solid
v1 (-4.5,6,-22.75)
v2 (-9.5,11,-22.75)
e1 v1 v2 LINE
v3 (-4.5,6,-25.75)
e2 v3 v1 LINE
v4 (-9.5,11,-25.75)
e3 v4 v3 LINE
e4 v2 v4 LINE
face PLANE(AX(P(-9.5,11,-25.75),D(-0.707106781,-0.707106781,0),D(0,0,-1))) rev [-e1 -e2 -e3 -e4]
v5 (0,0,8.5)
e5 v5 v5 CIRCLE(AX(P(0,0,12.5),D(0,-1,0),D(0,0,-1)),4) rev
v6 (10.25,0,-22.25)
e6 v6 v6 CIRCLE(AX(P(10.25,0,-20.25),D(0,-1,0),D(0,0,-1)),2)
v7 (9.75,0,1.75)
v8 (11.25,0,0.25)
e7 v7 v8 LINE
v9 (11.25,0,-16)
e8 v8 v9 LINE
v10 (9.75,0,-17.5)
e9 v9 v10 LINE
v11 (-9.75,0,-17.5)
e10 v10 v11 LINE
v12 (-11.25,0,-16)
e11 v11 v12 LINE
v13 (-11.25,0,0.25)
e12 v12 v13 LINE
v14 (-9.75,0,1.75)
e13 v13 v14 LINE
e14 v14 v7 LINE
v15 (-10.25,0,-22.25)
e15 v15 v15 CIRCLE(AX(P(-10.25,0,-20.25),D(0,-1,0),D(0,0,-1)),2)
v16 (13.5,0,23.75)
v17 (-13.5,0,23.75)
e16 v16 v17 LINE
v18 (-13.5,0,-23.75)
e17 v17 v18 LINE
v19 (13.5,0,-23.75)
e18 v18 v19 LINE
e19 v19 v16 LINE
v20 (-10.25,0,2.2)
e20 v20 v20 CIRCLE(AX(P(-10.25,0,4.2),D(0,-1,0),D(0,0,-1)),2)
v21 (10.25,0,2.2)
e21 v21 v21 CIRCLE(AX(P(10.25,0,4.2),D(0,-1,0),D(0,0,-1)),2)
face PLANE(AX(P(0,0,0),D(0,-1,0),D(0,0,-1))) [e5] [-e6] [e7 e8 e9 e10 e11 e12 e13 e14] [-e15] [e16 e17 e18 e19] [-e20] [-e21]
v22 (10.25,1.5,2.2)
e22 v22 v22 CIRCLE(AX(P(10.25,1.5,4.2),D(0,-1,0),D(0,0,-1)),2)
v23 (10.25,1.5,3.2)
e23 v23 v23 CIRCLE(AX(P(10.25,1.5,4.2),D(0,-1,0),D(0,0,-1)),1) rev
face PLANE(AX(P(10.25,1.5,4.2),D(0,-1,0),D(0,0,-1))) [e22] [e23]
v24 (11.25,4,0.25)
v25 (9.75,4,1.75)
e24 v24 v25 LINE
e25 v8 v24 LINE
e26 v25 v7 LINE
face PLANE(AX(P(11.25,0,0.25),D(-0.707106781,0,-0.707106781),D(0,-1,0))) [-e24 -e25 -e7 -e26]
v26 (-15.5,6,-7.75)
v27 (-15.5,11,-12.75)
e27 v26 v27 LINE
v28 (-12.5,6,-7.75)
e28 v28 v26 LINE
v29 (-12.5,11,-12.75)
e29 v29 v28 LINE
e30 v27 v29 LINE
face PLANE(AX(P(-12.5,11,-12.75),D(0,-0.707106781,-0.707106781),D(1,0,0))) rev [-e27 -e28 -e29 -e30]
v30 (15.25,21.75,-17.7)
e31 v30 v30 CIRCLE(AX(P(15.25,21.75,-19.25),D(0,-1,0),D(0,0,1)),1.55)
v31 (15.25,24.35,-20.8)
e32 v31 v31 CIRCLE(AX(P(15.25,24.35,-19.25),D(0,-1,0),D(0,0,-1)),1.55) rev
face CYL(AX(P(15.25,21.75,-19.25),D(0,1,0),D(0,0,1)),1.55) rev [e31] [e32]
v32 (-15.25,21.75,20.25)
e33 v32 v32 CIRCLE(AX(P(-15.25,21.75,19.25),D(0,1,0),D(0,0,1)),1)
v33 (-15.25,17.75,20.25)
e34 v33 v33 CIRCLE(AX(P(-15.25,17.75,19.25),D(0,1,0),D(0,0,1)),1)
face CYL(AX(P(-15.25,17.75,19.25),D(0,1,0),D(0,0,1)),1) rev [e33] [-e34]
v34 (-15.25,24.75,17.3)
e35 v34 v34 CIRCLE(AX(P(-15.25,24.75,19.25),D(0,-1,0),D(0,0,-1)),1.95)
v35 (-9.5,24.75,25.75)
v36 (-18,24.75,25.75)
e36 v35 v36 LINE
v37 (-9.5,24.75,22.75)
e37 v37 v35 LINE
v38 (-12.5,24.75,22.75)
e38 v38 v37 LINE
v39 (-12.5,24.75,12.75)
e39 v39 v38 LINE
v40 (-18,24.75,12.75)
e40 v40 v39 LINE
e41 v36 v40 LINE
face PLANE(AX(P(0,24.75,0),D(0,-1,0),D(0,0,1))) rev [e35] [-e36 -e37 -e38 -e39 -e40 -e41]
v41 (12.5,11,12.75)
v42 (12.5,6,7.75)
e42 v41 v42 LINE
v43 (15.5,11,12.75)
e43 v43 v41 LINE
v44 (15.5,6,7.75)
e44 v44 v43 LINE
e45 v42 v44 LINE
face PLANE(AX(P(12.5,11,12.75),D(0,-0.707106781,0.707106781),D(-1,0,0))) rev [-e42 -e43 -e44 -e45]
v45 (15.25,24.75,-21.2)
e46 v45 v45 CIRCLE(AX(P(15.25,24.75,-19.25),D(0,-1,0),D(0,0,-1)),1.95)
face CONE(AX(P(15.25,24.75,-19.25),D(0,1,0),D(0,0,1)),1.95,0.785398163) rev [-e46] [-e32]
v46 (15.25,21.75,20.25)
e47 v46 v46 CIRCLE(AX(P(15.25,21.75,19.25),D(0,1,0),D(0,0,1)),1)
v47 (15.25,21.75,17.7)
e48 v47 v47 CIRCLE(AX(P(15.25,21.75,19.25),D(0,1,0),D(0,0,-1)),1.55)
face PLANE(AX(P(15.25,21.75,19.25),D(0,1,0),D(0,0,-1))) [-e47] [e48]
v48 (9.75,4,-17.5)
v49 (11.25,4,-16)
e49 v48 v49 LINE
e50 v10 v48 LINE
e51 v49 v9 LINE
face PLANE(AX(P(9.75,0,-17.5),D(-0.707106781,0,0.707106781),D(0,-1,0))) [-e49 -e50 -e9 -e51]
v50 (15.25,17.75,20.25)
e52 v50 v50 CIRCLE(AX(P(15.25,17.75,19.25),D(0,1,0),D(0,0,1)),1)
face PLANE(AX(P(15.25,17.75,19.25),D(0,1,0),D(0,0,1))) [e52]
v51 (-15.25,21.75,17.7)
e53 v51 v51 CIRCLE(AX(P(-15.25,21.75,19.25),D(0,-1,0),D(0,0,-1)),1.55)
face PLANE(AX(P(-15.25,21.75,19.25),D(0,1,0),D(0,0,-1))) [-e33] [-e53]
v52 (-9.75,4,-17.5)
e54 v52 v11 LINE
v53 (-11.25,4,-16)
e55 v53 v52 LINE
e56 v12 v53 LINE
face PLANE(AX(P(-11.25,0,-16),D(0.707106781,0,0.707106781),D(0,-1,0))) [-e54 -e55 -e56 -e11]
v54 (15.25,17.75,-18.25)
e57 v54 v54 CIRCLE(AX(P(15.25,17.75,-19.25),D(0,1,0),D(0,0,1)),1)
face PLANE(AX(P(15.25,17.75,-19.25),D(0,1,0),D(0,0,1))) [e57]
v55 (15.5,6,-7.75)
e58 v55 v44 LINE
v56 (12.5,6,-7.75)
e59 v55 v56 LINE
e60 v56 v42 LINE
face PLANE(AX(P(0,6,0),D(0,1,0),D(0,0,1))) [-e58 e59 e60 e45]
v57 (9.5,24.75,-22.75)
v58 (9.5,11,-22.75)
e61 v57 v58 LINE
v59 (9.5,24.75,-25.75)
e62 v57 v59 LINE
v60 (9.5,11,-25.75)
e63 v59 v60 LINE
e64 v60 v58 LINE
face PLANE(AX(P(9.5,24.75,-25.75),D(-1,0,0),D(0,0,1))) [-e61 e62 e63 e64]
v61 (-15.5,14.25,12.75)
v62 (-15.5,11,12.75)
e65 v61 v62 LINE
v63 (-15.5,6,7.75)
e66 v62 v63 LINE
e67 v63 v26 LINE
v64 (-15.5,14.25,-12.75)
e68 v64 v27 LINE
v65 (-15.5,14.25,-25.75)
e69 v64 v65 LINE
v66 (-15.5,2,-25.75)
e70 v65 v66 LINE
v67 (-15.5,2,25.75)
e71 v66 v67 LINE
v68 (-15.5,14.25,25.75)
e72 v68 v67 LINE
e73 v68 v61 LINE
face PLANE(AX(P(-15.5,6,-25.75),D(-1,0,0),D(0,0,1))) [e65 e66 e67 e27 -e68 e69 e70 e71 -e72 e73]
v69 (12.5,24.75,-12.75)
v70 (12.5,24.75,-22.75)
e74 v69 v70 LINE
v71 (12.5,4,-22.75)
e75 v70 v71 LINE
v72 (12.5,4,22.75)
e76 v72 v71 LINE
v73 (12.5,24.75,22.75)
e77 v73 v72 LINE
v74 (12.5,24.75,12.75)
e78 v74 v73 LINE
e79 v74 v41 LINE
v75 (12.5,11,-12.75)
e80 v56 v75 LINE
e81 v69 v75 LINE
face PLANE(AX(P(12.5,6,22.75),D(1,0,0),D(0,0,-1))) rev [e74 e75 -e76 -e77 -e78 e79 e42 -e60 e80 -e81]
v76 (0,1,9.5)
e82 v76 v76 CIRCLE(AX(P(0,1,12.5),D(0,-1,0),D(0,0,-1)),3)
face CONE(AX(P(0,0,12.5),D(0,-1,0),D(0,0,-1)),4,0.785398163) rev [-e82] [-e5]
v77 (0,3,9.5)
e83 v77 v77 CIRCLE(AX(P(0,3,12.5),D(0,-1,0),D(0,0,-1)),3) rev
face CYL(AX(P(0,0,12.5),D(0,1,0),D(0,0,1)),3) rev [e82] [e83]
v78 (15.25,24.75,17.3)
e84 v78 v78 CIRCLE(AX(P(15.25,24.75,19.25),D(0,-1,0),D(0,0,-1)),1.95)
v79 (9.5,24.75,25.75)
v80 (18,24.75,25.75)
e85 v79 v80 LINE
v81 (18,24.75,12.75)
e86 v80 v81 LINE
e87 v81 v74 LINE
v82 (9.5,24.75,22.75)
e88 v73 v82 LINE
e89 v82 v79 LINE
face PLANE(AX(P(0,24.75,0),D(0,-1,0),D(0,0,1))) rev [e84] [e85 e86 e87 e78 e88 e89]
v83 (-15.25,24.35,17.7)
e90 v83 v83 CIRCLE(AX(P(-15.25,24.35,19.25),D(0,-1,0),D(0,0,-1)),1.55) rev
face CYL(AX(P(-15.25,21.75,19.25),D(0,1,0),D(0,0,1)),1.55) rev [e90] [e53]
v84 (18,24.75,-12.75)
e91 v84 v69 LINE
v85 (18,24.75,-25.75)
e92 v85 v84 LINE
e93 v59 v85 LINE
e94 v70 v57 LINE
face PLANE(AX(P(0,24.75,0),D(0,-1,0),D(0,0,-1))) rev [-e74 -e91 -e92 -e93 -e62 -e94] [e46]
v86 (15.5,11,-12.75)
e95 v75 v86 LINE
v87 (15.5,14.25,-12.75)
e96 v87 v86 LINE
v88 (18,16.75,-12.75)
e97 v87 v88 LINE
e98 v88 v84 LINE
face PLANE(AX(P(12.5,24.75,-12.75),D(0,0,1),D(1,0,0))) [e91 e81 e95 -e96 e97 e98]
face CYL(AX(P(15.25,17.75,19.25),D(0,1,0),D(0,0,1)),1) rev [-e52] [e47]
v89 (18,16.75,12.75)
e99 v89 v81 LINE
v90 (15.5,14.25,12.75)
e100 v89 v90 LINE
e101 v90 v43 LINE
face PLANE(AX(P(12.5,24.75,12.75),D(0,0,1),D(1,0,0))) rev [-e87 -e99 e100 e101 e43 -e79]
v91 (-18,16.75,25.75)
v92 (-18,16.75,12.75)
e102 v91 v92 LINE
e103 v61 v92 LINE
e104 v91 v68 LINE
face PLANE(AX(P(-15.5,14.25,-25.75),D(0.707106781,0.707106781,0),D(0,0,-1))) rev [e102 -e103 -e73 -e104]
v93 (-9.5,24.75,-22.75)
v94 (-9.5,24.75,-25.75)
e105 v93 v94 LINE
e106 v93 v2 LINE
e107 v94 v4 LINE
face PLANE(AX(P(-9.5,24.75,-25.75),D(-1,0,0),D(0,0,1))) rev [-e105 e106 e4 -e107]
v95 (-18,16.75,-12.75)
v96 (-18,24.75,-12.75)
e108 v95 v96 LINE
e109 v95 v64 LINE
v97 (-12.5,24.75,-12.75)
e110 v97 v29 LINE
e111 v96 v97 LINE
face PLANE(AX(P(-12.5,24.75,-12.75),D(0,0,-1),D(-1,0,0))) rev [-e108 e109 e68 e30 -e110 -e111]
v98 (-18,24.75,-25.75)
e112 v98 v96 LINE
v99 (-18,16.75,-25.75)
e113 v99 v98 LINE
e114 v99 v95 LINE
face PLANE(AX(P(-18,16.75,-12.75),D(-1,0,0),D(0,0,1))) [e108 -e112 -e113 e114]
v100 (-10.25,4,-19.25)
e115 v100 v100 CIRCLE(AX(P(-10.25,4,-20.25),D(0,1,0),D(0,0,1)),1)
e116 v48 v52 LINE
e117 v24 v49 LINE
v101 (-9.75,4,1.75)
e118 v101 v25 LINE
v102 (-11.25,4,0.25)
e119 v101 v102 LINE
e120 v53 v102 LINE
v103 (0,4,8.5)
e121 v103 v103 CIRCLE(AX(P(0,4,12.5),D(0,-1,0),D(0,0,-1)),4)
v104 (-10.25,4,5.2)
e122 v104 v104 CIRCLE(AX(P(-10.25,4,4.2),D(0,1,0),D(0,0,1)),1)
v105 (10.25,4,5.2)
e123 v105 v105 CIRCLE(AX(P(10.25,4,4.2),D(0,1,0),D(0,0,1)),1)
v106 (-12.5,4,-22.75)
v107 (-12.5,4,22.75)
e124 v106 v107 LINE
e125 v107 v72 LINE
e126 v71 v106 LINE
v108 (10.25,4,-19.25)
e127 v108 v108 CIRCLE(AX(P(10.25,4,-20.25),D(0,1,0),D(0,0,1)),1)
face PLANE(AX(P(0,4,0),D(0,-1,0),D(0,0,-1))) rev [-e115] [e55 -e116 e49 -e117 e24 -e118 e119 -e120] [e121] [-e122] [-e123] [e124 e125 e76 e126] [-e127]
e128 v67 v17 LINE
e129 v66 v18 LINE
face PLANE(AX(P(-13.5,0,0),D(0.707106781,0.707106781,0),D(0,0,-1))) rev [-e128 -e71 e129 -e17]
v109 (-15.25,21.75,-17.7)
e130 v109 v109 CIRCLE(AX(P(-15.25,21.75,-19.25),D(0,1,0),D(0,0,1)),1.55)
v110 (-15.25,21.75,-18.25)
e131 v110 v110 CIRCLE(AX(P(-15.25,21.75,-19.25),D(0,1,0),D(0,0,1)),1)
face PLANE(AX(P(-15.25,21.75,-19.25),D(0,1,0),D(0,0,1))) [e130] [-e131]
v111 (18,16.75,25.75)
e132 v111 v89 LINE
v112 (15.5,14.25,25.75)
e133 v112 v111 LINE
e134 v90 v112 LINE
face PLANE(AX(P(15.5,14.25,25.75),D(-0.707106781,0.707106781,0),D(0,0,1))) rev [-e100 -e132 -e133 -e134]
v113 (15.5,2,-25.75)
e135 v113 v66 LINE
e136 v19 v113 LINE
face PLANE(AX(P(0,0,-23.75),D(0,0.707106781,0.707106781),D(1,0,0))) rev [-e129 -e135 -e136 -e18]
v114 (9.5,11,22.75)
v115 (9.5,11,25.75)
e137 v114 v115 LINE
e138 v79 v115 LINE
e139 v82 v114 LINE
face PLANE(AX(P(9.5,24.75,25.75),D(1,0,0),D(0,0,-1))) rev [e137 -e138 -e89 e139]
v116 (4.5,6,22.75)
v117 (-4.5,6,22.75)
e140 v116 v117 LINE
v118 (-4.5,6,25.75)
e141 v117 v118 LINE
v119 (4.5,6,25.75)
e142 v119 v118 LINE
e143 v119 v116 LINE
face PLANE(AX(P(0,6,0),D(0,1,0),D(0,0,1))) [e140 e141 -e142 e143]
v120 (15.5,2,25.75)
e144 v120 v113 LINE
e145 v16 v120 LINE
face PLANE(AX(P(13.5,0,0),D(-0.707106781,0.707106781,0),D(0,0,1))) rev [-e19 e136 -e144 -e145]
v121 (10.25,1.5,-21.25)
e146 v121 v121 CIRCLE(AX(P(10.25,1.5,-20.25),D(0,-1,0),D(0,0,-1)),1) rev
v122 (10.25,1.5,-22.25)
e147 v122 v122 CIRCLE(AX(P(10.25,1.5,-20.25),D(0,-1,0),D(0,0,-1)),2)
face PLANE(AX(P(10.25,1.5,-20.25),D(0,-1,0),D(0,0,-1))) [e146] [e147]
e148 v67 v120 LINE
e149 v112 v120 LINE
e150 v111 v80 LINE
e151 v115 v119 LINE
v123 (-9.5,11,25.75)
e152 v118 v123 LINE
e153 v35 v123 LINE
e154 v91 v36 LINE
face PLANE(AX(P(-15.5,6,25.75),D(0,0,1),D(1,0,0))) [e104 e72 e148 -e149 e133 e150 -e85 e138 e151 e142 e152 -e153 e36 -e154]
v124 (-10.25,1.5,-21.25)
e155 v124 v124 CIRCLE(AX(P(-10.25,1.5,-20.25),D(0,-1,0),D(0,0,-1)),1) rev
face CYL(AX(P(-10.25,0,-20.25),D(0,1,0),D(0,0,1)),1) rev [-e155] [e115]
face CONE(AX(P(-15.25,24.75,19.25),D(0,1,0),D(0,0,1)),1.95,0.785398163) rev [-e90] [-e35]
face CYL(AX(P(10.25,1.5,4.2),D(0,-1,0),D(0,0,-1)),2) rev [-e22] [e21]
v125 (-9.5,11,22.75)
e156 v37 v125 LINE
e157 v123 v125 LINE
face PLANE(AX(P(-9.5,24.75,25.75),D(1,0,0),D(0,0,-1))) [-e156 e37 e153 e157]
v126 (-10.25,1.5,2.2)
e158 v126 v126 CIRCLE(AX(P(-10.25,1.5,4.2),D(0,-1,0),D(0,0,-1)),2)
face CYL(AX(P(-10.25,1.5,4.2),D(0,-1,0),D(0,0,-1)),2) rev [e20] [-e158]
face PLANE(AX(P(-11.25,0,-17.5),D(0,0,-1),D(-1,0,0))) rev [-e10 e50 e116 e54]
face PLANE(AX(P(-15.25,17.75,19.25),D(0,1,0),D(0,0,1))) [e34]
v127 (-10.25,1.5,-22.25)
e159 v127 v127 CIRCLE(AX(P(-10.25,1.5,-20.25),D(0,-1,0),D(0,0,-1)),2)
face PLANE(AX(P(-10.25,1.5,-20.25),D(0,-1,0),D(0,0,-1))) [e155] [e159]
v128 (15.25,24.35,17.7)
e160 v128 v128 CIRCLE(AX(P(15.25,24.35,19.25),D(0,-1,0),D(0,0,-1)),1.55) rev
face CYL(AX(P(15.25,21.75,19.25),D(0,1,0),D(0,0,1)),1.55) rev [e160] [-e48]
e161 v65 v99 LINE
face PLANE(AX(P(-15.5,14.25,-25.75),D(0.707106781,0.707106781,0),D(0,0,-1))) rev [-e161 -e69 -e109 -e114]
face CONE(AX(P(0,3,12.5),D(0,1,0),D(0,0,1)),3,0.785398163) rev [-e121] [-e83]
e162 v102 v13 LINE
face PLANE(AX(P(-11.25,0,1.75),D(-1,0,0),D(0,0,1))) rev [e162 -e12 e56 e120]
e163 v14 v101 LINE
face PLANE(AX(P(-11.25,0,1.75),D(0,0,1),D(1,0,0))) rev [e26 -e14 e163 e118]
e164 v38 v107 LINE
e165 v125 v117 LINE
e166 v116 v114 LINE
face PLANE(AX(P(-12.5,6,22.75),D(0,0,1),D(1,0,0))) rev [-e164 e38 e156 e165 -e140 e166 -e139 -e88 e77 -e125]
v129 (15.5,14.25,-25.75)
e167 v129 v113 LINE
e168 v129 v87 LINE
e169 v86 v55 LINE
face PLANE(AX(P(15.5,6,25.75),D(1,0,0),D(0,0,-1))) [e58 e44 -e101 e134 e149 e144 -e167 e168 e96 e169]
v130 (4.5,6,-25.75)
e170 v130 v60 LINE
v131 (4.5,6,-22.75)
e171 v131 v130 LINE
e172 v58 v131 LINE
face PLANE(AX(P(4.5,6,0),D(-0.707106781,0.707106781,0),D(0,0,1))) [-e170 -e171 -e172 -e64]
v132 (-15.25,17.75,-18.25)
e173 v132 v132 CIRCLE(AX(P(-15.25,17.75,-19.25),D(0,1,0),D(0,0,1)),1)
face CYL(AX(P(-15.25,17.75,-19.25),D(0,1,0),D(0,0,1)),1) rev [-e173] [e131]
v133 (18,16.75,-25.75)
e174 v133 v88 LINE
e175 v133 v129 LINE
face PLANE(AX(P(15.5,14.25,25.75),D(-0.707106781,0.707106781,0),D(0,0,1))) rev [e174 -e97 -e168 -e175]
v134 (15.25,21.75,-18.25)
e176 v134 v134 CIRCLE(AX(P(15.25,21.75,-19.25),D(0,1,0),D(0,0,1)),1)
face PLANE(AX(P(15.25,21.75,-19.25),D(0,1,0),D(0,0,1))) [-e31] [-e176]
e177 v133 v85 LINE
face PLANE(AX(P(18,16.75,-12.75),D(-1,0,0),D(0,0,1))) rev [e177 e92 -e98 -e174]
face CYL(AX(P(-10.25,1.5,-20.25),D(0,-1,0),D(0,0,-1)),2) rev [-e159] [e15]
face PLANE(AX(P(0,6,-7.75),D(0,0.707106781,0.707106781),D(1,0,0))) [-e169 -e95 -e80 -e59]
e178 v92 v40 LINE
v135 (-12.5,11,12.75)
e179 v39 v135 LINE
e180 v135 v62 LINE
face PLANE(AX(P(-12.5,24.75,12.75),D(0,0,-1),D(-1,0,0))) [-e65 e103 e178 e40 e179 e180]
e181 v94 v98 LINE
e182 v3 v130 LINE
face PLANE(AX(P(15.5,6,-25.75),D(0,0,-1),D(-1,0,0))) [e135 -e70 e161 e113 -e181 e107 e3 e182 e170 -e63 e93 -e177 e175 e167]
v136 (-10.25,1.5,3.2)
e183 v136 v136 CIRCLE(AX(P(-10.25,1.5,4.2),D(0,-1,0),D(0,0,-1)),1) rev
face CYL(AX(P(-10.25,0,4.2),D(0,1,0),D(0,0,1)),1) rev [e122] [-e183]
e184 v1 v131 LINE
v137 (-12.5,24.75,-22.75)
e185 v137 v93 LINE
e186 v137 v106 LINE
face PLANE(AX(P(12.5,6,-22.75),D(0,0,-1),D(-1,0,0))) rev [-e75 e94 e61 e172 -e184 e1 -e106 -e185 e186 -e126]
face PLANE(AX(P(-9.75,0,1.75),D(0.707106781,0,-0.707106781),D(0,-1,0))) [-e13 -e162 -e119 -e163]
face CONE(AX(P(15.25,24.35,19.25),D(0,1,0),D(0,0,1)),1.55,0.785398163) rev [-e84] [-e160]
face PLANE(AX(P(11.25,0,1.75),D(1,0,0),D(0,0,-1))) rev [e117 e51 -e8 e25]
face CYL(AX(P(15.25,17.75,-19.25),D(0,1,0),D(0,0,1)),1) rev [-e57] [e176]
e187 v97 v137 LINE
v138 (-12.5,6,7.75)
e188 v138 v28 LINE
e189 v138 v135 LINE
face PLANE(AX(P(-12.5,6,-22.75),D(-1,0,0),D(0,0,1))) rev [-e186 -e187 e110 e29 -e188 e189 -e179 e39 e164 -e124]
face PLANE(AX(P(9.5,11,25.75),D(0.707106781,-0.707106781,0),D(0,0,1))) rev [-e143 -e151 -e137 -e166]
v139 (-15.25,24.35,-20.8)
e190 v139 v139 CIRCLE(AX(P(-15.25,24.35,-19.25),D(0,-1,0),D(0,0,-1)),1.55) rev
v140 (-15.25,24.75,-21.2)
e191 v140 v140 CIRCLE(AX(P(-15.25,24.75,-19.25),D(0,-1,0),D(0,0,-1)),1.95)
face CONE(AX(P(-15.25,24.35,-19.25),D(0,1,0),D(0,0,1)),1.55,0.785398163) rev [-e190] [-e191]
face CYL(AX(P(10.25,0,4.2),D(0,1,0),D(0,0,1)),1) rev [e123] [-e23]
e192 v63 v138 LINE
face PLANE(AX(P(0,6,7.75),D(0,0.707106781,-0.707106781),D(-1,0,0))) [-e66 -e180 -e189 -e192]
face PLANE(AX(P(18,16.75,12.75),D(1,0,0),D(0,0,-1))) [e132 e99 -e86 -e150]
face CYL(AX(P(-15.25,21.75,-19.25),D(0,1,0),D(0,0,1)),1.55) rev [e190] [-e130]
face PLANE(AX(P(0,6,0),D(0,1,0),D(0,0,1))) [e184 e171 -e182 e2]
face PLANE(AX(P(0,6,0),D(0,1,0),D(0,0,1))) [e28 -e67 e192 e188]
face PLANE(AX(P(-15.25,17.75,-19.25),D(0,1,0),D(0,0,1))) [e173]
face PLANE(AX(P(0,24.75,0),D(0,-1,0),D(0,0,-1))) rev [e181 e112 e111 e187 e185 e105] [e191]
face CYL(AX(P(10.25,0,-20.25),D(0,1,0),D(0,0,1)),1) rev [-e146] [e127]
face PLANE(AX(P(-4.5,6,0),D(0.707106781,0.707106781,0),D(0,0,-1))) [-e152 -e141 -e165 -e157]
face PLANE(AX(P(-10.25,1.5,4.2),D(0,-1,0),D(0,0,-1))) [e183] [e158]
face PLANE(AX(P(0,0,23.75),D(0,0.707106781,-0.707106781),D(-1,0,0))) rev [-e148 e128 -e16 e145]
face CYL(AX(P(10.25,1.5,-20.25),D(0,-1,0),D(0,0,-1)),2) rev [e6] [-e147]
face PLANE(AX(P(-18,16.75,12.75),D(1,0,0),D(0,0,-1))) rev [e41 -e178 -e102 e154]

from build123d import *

# Parameters (mm, degrees)
SKETCH1_W                                  = 25
SKETCH1_H                                  = 45.5
BOSS_EXTRUDE1_DEPTH                        = 4
SKETCH2_R                                  = 1
CUT_EXTRUDE1_DEPTH                         = 27.264281829
SKETCH3_W                                  = 22.5
SKETCH3_H                                  = 19.25
CUT_EXTRUDE2_DEPTH                         = 4
CHAMFER1_SIZE                              = 1.5
SKETCH4_R                                  = 3
CUT_EXTRUDE3_DEPTH                         = 27.264281829
SKETCH11_W                                 = 31
SKETCH11_H                                 = 51.5
SKETCH11_W_2                               = 25
SKETCH11_H_2                               = 45.5
BOSS_EXTRUDE5_DEPTH                        = 6
BOSS_EXTRUDE6_DEPTH                        = 18.75
SKETCH14_W                                 = 5.5
SKETCH14_H                                 = 13
BOSS_EXTRUDE7_DEPTH                        = 8
SKETCH15_R                                 = 1.55
CUT_EXTRUDE5_DEPTH                         = 3
MIRROR2_AT_THE_SECOND_PLANE_COPY_1_DEPTH   = 18.75
MIRROR2_AT_THE_SECOND_PLANE_COPY_2_SKETC_W = 5.5
MIRROR2_AT_THE_SECOND_PLANE_COPY_2_SKETC_H = 13
MIRROR2_AT_THE_SECOND_PLANE_COPY_2_DEPTH   = 8
MIRROR2_AT_THE_SECOND_PLANE_COPY_3_SKETC_R = 1.55
MIRROR2_AT_THE_SECOND_PLANE_COPY_3_DEPTH   = 3
CHAMFER3_SIZE                              = 2.5
CHAMFER4_SIZE                              = 5
CHAMFER5_SIZE                              = 2
SKETCH16_R                                 = 2
CUT_EXTRUDE6_DEPTH                         = 1.5
CHAMFER6_SIZE                              = 1
CHAMFER7_SIZE                              = 0.4
SKETCH17_R                                 = 1
CUT_EXTRUDE7_DEPTH                         = 4


with BuildPart() as part:
    # Sketch1 → Boss-Extrude1 (new body)
    with BuildSketch(Plane(origin=(0, 0, 0), x_dir=(1, 0, 0), z_dir=(0, 1, 0))):
        Rectangle(SKETCH1_W, SKETCH1_H)
    extrude(amount=BOSS_EXTRUDE1_DEPTH)

    # Sketch2 → Cut-Extrude1 (cut, through all)
    with BuildSketch(Plane(origin=(0, 4, 0), x_dir=(1, 0, 0), z_dir=(0, 1, 0))):
        with Locations(Location((-10.25, 20.25, 0), (0, 0, 270))):
            Circle(SKETCH2_R)
        with Locations(Location((10.25, 20.25, 0), (0, 0, 270))):
            Circle(SKETCH2_R)
        with Locations(Location((10.25, -4.2, 0), (0, 0, 270))):
            Circle(SKETCH2_R)
        with Locations(Location((-10.25, -4.2, 0), (0, 0, 270))):
            Circle(SKETCH2_R)
    extrude(amount=-CUT_EXTRUDE1_DEPTH, mode=Mode.SUBTRACT)

    # Sketch3 → Cut-Extrude2 (cut)
    with BuildSketch(Plane(origin=(0, 4, 0), x_dir=(1, 0, 0), z_dir=(0, 1, 0))):
        with Locations((0, 7.875)):
            Rectangle(SKETCH3_W, SKETCH3_H)
    extrude(amount=-CUT_EXTRUDE2_DEPTH, mode=Mode.SUBTRACT)

    # Chamfer1
    chamfer1_edges = [part.edges().sort_by_distance(p)[0] for p in [
        (11.25, 2, -17.5),
        (11.25, 2, 1.75),
        (-11.25, 2, 1.75),
        (-11.25, 2, -17.5),
    ]]
    chamfer(chamfer1_edges, length=CHAMFER1_SIZE)

    # Sketch4 → Cut-Extrude3 (cut, through all)
    with BuildSketch(Plane(origin=(0, 4, 0), x_dir=(1, 0, 0), z_dir=(0, 1, 0))):
        with Locations(Location((0, -12.5, 0), (0, 0, 270))):
            Circle(SKETCH4_R)
    extrude(amount=-CUT_EXTRUDE3_DEPTH, mode=Mode.SUBTRACT)

    # Sketch11 → Boss-Extrude5 (add)
    with BuildSketch(Plane.XZ):
        Rectangle(SKETCH11_W, SKETCH11_H)
        Rectangle(SKETCH11_W_2, SKETCH11_H_2, mode=Mode.SUBTRACT)
    extrude(amount=-BOSS_EXTRUDE5_DEPTH)

    # Sketch12 → Boss-Extrude6 (add)
    with BuildSketch(Plane(origin=(0, 6, 0), x_dir=(1, 0, 0), z_dir=(0, 1, 0))):
        Polygon((-15.5, 25.75), (-9.5, 25.75), (-9.5, 22.75), (-12.5, 22.75), (-12.5, 12.75), (-15.5, 12.75), align=None)
    boss_extrude6 = extrude(amount=BOSS_EXTRUDE6_DEPTH)

    # Sketch14 → Boss-Extrude7 (add)
    with BuildSketch(Plane(origin=(0, 24.75, 0), x_dir=(1, 0, 0), z_dir=(0, 1, 0))):
        with Locations((-15.25, 19.25)):
            Rectangle(SKETCH14_W, SKETCH14_H)
    boss_extrude7 = extrude(amount=-BOSS_EXTRUDE7_DEPTH)

    # Sketch15 → Cut-Extrude5 (cut)
    with BuildSketch(Plane(origin=(0, 24.75, 0), x_dir=(1, 0, 0), z_dir=(0, 1, 0))):
        with Locations(Location((-15.25, 19.25, 0), (0, 0, 270))):
            Circle(SKETCH15_R)
    cut_extrude5 = extrude(amount=-CUT_EXTRUDE5_DEPTH, mode=Mode.SUBTRACT)

    # Mirror2: Boss-Extrude6, Boss-Extrude7, Cut-Extrude5 across plane
    add(boss_extrude6.mirror(Plane(origin=(0, 0, 0), x_dir=(0, 0, 1), z_dir=(1, 0, 0))))
    add(boss_extrude7.mirror(Plane(origin=(0, 0, 0), x_dir=(0, 0, 1), z_dir=(1, 0, 0))))
    add(cut_extrude5.mirror(Plane(origin=(0, 0, 0), x_dir=(0, 0, 1), z_dir=(1, 0, 0))), mode=Mode.SUBTRACT)

    # Mirror2 at the second plane: Boss-Extrude6, Boss-Extrude7, Cut-Extrude5 across plane
    add(boss_extrude6.mirror(Plane.XY))
    add(boss_extrude7.mirror(Plane.XY))
    add(cut_extrude5.mirror(Plane.XY), mode=Mode.SUBTRACT)

    # Mirror2 at the second plane copy 1 sketc → Mirror2 at the second plane copy 1 (add)
    with BuildSketch(Plane(origin=(0, 6, 0), x_dir=(-1, 0, 0), z_dir=(0, 1, 0))):
        Polygon((-15.5, 25.75), (-9.5, 25.75), (-9.5, 22.75), (-12.5, 22.75), (-12.5, 12.75), (-15.5, 12.75), align=None)
    extrude(amount=MIRROR2_AT_THE_SECOND_PLANE_COPY_1_DEPTH)

    # Mirror2 at the second plane copy 2 sketc → Mirror2 at the second plane copy 2 (add)
    with BuildSketch(Plane(origin=(0, 24.75, 0), x_dir=(-1, 0, 0), z_dir=(0, 1, 0))):
        with Locations((-15.25, 19.25)):
            Rectangle(MIRROR2_AT_THE_SECOND_PLANE_COPY_2_SKETC_W, MIRROR2_AT_THE_SECOND_PLANE_COPY_2_SKETC_H)
    extrude(amount=-MIRROR2_AT_THE_SECOND_PLANE_COPY_2_DEPTH)

    # Mirror2 at the second plane copy 3 sketc → Mirror2 at the second plane copy 3 (cut)
    with BuildSketch(Plane(origin=(0, 24.75, 0), x_dir=(-1, 0, 0), z_dir=(0, 1, 0))):
        with Locations(Location((-15.25, 19.25, 0), (0, 0, 270))):
            Circle(MIRROR2_AT_THE_SECOND_PLANE_COPY_3_SKETC_R)
    extrude(amount=-MIRROR2_AT_THE_SECOND_PLANE_COPY_3_DEPTH, mode=Mode.SUBTRACT)

    # Chamfer3
    # the kernel refuses this chamfer: 2.5 mm, written as the material it adds along each edge
    with BuildSketch(Plane(origin=(-15.5, 16.75, -12.75), x_dir=(0.027495876610586317, -0.9996219169112968, 0), z_dir=(0, 0, -1))) as chamfer3_piece_1_section:
        Polygon((CHAMFER3_SIZE * 0.999621916911, CHAMFER3_SIZE * 0.0274958766106), (-CHAMFER3_SIZE * 0.0274958766106, CHAMFER3_SIZE * 0.999621916911), (0, 0), align=None)
    chamfer3_piece_1 = extrude(amount=13, mode=Mode.PRIVATE)
    chamfer3_piece_1 = split(chamfer3_piece_1, bisect_by=Plane(origin=(-18, 15.923989614, -19.25), z_dir=(1, 0, 0)), keep=Keep.TOP, mode=Mode.PRIVATE)
    add(chamfer3_piece_1)
    with BuildSketch(Plane(origin=(-15.5, 16.75, 12.75), x_dir=(0.027495876610586317, -0.9996219169112968, 0), z_dir=(0, 0, 1))) as chamfer3_piece_2_section:
        Polygon((CHAMFER3_SIZE * 0.999621916911, -CHAMFER3_SIZE * 0.0274958766106), (-CHAMFER3_SIZE * 0.0274958766106, -CHAMFER3_SIZE * 0.999621916911), (0, 0), align=None)
    chamfer3_piece_2 = extrude(amount=13, mode=Mode.PRIVATE)
    chamfer3_piece_2 = split(chamfer3_piece_2, bisect_by=Plane(origin=(-18, 15.923989614, 19.25), z_dir=(1, 0, 0)), keep=Keep.TOP, mode=Mode.PRIVATE)
    add(chamfer3_piece_2)
    with BuildSketch(Plane(origin=(15.5, 16.75, -12.75), x_dir=(-0.027495876610586317, -0.9996219169112968, 0), z_dir=(0, 0, -1))) as chamfer3_piece_3_section:
        Polygon((CHAMFER3_SIZE * 0.999621916911, -CHAMFER3_SIZE * 0.0274958766106), (-CHAMFER3_SIZE * 0.0274958766106, -CHAMFER3_SIZE * 0.999621916911), (0, 0), align=None)
    chamfer3_piece_3 = extrude(amount=13, mode=Mode.PRIVATE)
    chamfer3_piece_3 = split(chamfer3_piece_3, bisect_by=Plane(origin=(18, 15.923989614, -19.25), z_dir=(-1, 0, 0)), keep=Keep.TOP, mode=Mode.PRIVATE)
    add(chamfer3_piece_3)
    with BuildSketch(Plane(origin=(15.5, 16.75, 12.75), x_dir=(-0.027495876610586317, -0.9996219169112968, 0), z_dir=(0, 0, 1))) as chamfer3_piece_4_section:
        Polygon((CHAMFER3_SIZE * 0.999621916911, CHAMFER3_SIZE * 0.0274958766106), (-CHAMFER3_SIZE * 0.0274958766106, CHAMFER3_SIZE * 0.999621916911), (0, 0), align=None)
    chamfer3_piece_4 = extrude(amount=13, mode=Mode.PRIVATE)
    chamfer3_piece_4 = split(chamfer3_piece_4, bisect_by=Plane(origin=(18, 15.923989614, 19.25), z_dir=(-1, 0, 0)), keep=Keep.TOP, mode=Mode.PRIVATE)
    add(chamfer3_piece_4)

    # Chamfer4
    chamfer4_edges = [part.edges().sort_by_distance(p)[0] for p in [
        (-14, 6, -12.75),
        (-9.5, 6, -24.25),
        (-14, 6, 12.75),
        (-9.5, 6, 24.25),
        (14, 6, -12.75),
        (9.5, 6, -24.25),
        (14, 6, 12.75),
        (9.5, 6, 24.25),
    ]]
    chamfer(chamfer4_edges, length=CHAMFER4_SIZE)

    # Chamfer5
    chamfer5_edges = [part.edges().sort_by_distance(p)[0] for p in [
        (0, 0, -25.75),
        (15.5, 0, 0),
        (0, 0, 25.75),
        (-15.5, 0, 0),
    ]]
    chamfer(chamfer5_edges, length=CHAMFER5_SIZE)

    # Sketch16 → Cut-Extrude6 (cut)
    with BuildSketch(Plane.XZ):
        with Locations(Location((-10.25, 4.2, 0), (0, 0, 270))):
            Circle(SKETCH16_R)
        with Locations(Location((10.25, 4.2, 0), (0, 0, 270))):
            Circle(SKETCH16_R)
        with Locations(Location((10.25, -20.25, 0), (0, 0, 270))):
            Circle(SKETCH16_R)
        with Locations(Location((-10.25, -20.25, 0), (0, 0, 270))):
            Circle(SKETCH16_R)
    extrude(amount=-CUT_EXTRUDE6_DEPTH, mode=Mode.SUBTRACT)

    # Chamfer6
    chamfer6_edges = [part.edges().sort_by_distance(p)[0] for p in [
        (0, 0, 9.5),
        (0, 4, 9.5),
    ]]
    chamfer(chamfer6_edges, length=CHAMFER6_SIZE)

    # Chamfer7
    chamfer7_edges = [part.edges().sort_by_distance(p)[0] for p in [
        (-15.25, 24.75, -20.8),
        (-15.25, 24.75, 20.8),
        (15.25, 24.75, -20.8),
        (15.25, 24.75, 20.8),
    ]]
    chamfer(chamfer7_edges, length=CHAMFER7_SIZE)

    # Sketch17 → Cut-Extrude7 (cut)
    with BuildSketch(Plane(origin=(0, 21.75, 0), x_dir=(1, 0, 0), z_dir=(0, 1, 0))):
        with Locations(Location((-15.25, 19.25, 0), (0, 0, 270))):
            Circle(SKETCH17_R)
        with Locations(Location((15.25, 19.25, 0), (0, 0, 270))):
            Circle(SKETCH17_R)
        with Locations(Location((15.25, -19.25, 0), (0, 0, 270))):
            Circle(SKETCH17_R)
        with Locations(Location((-15.25, -19.25, 0), (0, 0, 270))):
            Circle(SKETCH17_R)
    extrude(amount=-CUT_EXTRUDE7_DEPTH, mode=Mode.SUBTRACT)


solid = part.part
